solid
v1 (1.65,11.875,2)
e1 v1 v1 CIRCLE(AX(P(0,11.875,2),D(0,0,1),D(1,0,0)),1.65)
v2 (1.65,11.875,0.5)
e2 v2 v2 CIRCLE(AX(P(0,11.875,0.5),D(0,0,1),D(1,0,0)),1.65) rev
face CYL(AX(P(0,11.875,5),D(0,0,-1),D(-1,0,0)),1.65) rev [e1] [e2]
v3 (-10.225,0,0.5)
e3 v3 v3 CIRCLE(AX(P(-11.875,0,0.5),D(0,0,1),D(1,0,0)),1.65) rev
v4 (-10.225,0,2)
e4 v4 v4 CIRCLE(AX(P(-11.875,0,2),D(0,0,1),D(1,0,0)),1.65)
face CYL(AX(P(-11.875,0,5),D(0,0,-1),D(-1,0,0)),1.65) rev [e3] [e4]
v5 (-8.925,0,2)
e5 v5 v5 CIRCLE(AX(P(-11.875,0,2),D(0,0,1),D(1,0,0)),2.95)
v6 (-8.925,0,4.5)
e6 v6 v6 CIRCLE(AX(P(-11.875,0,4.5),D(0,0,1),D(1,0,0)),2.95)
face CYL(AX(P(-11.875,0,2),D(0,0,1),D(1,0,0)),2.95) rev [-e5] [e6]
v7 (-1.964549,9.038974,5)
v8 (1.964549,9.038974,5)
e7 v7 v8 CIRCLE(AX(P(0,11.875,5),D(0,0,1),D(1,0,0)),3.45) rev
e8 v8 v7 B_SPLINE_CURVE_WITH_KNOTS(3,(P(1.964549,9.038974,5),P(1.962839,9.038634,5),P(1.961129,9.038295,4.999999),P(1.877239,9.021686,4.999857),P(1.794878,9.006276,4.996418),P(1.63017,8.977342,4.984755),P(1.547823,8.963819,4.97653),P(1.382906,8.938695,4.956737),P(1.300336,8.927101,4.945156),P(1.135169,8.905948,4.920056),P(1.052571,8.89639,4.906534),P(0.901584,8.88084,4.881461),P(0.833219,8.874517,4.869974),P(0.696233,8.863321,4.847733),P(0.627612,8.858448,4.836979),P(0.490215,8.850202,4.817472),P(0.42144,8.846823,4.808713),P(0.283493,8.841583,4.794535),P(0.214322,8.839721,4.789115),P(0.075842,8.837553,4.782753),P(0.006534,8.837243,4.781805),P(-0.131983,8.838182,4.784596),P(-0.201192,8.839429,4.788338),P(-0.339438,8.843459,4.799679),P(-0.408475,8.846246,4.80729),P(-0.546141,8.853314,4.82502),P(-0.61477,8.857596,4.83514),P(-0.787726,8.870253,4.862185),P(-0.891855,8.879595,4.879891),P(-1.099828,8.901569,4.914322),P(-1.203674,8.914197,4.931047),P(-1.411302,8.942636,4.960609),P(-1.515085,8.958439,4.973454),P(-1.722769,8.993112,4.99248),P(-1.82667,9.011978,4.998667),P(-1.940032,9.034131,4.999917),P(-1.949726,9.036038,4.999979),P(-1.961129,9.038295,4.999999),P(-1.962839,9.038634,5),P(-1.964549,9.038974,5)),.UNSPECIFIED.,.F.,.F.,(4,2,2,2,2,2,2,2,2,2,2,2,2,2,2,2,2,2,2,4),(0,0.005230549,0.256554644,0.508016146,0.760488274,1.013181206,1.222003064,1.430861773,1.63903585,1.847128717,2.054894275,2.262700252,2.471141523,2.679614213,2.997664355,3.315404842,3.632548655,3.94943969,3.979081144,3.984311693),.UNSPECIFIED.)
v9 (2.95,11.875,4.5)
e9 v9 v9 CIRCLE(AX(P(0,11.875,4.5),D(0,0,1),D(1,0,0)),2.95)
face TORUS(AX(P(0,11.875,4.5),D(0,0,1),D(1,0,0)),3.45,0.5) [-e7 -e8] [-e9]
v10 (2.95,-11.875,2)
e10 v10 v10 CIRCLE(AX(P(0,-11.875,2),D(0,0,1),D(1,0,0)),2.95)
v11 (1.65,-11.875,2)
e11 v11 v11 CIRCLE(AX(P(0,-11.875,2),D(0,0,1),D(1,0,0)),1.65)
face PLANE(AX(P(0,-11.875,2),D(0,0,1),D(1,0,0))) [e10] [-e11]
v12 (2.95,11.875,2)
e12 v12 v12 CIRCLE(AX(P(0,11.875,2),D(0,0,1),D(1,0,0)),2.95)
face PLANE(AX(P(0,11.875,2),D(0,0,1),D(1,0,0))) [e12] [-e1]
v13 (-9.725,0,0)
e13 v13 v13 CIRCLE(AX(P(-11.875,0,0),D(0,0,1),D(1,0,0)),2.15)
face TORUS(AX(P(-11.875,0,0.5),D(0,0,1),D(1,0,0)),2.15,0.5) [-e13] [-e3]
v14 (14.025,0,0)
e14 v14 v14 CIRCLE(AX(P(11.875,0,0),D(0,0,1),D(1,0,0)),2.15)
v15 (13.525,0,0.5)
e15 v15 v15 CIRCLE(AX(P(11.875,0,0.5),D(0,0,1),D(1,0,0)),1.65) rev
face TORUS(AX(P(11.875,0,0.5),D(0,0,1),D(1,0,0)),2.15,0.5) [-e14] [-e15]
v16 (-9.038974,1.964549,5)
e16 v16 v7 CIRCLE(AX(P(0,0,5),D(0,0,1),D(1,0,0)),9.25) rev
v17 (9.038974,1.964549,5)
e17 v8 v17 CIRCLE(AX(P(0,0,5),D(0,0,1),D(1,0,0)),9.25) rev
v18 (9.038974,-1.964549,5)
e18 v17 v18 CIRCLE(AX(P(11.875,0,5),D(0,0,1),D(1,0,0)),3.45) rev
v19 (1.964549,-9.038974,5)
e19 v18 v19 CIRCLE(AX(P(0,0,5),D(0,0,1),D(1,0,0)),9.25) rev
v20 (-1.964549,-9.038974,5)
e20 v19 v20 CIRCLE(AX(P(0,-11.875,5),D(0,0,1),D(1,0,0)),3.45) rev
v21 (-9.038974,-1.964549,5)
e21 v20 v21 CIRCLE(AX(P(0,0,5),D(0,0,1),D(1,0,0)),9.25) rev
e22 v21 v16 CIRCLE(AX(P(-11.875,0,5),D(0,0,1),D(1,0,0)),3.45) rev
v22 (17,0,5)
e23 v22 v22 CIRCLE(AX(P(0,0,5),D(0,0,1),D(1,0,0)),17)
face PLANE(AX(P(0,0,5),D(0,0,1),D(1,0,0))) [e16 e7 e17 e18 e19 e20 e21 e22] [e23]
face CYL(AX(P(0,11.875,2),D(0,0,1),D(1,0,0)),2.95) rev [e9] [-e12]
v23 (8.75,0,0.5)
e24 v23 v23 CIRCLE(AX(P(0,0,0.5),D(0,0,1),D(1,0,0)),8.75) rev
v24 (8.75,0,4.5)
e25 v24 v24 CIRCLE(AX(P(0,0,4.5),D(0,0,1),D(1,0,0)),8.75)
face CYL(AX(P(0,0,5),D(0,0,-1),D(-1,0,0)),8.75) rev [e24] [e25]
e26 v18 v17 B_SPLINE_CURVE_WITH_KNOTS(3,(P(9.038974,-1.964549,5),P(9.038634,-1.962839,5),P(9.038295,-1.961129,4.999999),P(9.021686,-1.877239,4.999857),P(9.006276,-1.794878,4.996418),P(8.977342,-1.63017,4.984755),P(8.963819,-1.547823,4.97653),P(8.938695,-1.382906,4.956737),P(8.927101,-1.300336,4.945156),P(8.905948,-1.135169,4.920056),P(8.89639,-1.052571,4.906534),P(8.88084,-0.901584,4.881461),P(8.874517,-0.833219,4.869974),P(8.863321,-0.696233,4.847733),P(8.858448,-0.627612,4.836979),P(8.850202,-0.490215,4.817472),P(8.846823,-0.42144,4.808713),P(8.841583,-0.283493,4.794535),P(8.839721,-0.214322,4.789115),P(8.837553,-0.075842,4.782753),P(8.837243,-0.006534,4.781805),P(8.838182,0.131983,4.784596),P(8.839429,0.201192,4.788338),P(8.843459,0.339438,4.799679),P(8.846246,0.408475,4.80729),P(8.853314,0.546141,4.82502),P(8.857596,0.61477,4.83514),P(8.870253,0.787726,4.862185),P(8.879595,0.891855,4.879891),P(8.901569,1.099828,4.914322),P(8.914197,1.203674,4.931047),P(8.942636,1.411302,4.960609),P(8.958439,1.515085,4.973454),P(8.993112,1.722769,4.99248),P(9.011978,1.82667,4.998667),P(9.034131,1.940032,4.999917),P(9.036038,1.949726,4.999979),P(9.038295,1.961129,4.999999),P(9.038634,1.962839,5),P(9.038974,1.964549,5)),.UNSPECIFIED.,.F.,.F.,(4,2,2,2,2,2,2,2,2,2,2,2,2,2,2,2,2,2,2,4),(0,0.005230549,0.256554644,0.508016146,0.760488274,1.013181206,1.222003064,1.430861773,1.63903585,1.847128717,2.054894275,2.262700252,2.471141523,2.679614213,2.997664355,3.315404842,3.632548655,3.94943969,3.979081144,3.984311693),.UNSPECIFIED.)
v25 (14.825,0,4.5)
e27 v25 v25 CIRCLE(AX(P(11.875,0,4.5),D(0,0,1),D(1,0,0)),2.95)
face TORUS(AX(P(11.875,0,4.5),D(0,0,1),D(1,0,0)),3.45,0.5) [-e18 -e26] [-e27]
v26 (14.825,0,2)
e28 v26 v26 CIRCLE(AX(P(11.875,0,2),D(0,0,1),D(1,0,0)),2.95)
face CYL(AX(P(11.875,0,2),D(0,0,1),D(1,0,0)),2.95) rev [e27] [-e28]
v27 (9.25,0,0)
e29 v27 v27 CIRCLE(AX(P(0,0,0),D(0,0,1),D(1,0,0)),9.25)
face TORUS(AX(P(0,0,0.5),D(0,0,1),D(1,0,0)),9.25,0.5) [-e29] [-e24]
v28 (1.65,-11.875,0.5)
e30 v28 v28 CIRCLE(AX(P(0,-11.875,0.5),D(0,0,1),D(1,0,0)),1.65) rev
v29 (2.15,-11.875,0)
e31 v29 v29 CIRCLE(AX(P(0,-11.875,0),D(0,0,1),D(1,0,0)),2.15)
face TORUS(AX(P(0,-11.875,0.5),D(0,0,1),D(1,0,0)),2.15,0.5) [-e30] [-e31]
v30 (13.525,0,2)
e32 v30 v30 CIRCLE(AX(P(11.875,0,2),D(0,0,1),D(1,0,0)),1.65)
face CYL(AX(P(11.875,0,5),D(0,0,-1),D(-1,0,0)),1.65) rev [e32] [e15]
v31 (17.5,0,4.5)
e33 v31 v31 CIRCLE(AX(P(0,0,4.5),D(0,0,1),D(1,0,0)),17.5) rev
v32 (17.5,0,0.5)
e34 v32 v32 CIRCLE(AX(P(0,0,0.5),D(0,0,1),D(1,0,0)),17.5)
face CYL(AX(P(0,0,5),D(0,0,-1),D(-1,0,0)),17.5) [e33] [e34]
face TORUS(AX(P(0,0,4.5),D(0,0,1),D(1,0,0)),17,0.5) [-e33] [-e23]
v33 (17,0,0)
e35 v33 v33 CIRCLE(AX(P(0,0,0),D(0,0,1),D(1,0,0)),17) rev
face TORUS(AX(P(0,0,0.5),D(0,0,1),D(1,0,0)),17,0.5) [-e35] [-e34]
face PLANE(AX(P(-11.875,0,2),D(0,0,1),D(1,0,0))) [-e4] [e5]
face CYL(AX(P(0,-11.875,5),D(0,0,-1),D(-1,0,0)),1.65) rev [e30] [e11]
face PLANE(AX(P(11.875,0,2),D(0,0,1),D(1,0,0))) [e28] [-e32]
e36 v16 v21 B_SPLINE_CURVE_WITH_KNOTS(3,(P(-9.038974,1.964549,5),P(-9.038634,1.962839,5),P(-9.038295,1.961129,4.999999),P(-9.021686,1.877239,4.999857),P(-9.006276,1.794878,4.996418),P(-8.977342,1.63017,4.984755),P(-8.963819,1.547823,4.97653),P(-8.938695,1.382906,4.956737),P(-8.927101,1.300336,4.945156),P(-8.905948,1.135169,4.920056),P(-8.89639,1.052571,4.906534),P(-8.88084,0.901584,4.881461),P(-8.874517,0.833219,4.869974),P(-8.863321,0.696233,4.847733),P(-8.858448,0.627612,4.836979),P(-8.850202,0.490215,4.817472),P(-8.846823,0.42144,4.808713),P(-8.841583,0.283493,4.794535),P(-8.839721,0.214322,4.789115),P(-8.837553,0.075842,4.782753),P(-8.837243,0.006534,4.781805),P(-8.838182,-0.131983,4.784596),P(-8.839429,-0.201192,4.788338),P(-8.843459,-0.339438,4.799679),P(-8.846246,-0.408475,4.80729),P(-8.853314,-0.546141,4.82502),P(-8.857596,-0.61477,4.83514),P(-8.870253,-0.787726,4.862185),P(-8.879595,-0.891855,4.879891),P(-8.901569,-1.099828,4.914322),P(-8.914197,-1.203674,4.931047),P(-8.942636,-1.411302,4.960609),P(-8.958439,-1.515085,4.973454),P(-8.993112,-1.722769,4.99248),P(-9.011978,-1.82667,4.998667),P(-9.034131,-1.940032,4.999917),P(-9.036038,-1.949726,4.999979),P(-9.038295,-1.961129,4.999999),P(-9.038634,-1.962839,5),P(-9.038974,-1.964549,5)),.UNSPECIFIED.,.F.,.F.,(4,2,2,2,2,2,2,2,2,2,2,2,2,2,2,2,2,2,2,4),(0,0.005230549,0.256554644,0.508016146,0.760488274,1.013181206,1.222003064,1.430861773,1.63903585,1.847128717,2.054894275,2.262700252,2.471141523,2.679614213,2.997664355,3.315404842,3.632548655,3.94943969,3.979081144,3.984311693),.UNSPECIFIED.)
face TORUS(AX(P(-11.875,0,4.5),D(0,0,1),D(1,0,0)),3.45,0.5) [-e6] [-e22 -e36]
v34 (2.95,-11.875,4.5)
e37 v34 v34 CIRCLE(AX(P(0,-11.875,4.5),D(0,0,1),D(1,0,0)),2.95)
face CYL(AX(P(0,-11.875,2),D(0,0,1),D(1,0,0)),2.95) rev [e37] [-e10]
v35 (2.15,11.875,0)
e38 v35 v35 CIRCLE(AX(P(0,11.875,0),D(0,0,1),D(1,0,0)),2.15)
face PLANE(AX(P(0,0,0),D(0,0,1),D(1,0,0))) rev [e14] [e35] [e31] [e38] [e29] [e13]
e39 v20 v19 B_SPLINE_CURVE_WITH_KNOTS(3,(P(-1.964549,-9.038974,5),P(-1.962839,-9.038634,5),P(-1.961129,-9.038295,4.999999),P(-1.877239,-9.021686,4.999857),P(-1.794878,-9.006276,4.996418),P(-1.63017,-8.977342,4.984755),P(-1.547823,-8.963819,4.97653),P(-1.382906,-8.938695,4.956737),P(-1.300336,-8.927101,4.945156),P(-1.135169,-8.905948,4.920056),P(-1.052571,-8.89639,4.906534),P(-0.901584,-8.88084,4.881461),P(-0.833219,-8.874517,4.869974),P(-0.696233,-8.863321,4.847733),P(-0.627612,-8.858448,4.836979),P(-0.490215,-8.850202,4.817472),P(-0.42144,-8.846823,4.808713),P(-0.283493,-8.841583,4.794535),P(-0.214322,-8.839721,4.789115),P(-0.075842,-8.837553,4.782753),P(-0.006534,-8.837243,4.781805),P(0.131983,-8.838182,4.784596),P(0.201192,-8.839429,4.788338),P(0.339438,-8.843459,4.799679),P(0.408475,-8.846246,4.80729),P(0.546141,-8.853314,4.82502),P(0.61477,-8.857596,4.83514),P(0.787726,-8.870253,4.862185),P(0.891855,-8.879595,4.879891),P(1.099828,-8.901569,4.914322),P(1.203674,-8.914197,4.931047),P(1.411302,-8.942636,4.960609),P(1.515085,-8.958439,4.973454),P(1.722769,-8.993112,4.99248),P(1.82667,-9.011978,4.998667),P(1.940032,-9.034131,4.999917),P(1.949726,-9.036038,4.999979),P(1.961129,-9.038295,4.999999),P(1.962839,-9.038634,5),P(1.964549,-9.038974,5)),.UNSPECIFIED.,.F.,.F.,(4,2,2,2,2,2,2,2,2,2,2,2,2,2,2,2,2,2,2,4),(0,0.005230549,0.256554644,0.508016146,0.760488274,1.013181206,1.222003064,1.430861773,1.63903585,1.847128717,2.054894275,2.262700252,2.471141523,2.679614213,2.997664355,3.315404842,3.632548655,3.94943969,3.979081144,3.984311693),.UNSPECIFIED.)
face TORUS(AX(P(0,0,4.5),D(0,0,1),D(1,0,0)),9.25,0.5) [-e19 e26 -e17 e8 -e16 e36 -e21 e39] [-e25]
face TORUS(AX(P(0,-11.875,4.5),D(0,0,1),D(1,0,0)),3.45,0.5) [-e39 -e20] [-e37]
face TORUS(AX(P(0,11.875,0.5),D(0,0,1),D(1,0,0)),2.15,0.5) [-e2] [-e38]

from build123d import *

# Parameters (mm, degrees)
SKIZZE1_R                       = 17.5
SKIZZE1_R_2                     = 15
SKIZZE1_R_3                     = 1.65
SKIZZE1_R_4                     = 8.75
AUFSATZ_LINEAR_AUSTRAGEN1_DEPTH = 5
SKIZZE2_R                       = 2.95
SCHNITT_LINEAR_AUSTRAGEN1_DEPTH = 3
VERRUNDUNG1_R                   = 0.5


with BuildPart() as part:
    # Skizze1 → Aufsatz-Linear austragen1 (new body)
    # profile 1 of 2: a face of its own
    with BuildSketch(Plane.XY):
        Circle(SKIZZE1_R)
        Circle(SKIZZE1_R_2, mode=Mode.SUBTRACT)
    # profile 2 of 2: a face of its own
    with BuildSketch(Plane.XY):
        Circle(SKIZZE1_R_2)
        with Locations((-11.875, 0)):
            Circle(SKIZZE1_R_3, mode=Mode.SUBTRACT)
        with Locations((0, -11.875)):
            Circle(SKIZZE1_R_3, mode=Mode.SUBTRACT)
        with Locations((11.875, 0)):
            Circle(SKIZZE1_R_3, mode=Mode.SUBTRACT)
        with Locations((0, 11.875)):
            Circle(SKIZZE1_R_3, mode=Mode.SUBTRACT)
        Circle(SKIZZE1_R_4, mode=Mode.SUBTRACT)
    extrude(amount=AUFSATZ_LINEAR_AUSTRAGEN1_DEPTH)

    # Skizze2 → Schnitt-Linear austragen1 (cut)
    with BuildSketch(Plane.XY.offset(5)):
        with Locations((0, 11.875)):
            Circle(SKIZZE2_R)
        with Locations((11.875, 0)):
            Circle(SKIZZE2_R)
        with Locations((0, -11.875)):
            Circle(SKIZZE2_R)
        with Locations((-11.875, 0)):
            Circle(SKIZZE2_R)
    extrude(amount=-SCHNITT_LINEAR_AUSTRAGEN1_DEPTH, mode=Mode.SUBTRACT)

    # Verrundung1
    # the kernel refuses this fillet: 0.5 mm, written as the material it takes off along each edge
    with BuildSketch(Plane(origin=(0, -11.875, 0), x_dir=(1, 0, 0), z_dir=(0, -1, 0))) as verrundung1_piece_1:
        with BuildLine():
            CenterArc((1.65 + VERRUNDUNG1_R, VERRUNDUNG1_R), VERRUNDUNG1_R, 180, 90)
            Line((1.65, VERRUNDUNG1_R), (1.65, 0))
            Line((1.65, 0), (1.65 + VERRUNDUNG1_R, 0))
        make_face()
    revolve(axis=Axis((0, -11.875, 0), (0, 0, 1)), mode=Mode.SUBTRACT)
    with BuildSketch(Plane(origin=(-11.875, 0, 0), x_dir=(1, 0, 0), z_dir=(0, -1, 0))) as verrundung1_piece_2:
        with BuildLine():
            CenterArc((1.65 + VERRUNDUNG1_R, VERRUNDUNG1_R), VERRUNDUNG1_R, 180, 90)
            Line((1.65, VERRUNDUNG1_R), (1.65, 0))
            Line((1.65, 0), (1.65 + VERRUNDUNG1_R, 0))
        make_face()
    revolve(axis=Axis((-11.875, 0, 0), (0, 0, 1)), mode=Mode.SUBTRACT)
    with BuildSketch(Plane(origin=(0, 11.875, 5), x_dir=(1, 0, 0), z_dir=(0, -1, 0))) as verrundung1_piece_3:
        with BuildLine():
            CenterArc((2.95 + VERRUNDUNG1_R, -VERRUNDUNG1_R), VERRUNDUNG1_R, 90, 90)
            Line((2.95, -VERRUNDUNG1_R), (2.95, 0))
            Line((2.95, 0), (2.95 + VERRUNDUNG1_R, 0))
        make_face()
    revolve(axis=Axis((0, 11.875, 5), (0, 0, 1)), mode=Mode.SUBTRACT)
    with BuildSketch(Plane(origin=(0, 0, 5), x_dir=(1, 0, 0), z_dir=(0, -1, 0))) as verrundung1_piece_4:
        with BuildLine():
            CenterArc((8.75 + VERRUNDUNG1_R, -VERRUNDUNG1_R), VERRUNDUNG1_R, 90, 90)
            Line((8.75, -VERRUNDUNG1_R), (8.75, 0))
            Line((8.75, 0), (8.75 + VERRUNDUNG1_R, 0))
        make_face()
    revolve(axis=Axis((0, 0, 5), (0, 0, 1)), mode=Mode.SUBTRACT)
    with BuildSketch(Plane(origin=(11.875, 0, 5), x_dir=(1, 0, 0), z_dir=(0, -1, 0))) as verrundung1_piece_5:
        with BuildLine():
            CenterArc((2.95 + VERRUNDUNG1_R, -VERRUNDUNG1_R), VERRUNDUNG1_R, 90, 90)
            Line((2.95, -VERRUNDUNG1_R), (2.95, 0))
            Line((2.95, 0), (2.95 + VERRUNDUNG1_R, 0))
        make_face()
    revolve(axis=Axis((11.875, 0, 5), (0, 0, 1)), mode=Mode.SUBTRACT)
    with BuildSketch(Plane(origin=(0, -11.875, 5), x_dir=(1, 0, 0), z_dir=(0, -1, 0))) as verrundung1_piece_6:
        with BuildLine():
            CenterArc((2.95 + VERRUNDUNG1_R, -VERRUNDUNG1_R), VERRUNDUNG1_R, 90, 90)
            Line((2.95, -VERRUNDUNG1_R), (2.95, 0))
            Line((2.95, 0), (2.95 + VERRUNDUNG1_R, 0))
        make_face()
    revolve(axis=Axis((0, -11.875, 5), (0, 0, 1)), mode=Mode.SUBTRACT)
    with BuildSketch(Plane(origin=(0, 0, 5), x_dir=(1, 0, 0), z_dir=(0, -1, 0))) as verrundung1_piece_7:
        with BuildLine():
            CenterArc((17.5 - VERRUNDUNG1_R, -VERRUNDUNG1_R), VERRUNDUNG1_R, 0, 90)
            Line((17.5 - VERRUNDUNG1_R, 0), (17.5, 0))
            Line((17.5, 0), (17.5, -VERRUNDUNG1_R))
        make_face()
    revolve(axis=Axis((0, 0, 5), (0, 0, 1)), mode=Mode.SUBTRACT)
    with BuildSketch(Plane(origin=(-11.875, 0, 5), x_dir=(1, 0, 0), z_dir=(0, -1, 0))) as verrundung1_piece_8:
        with BuildLine():
            CenterArc((2.95 + VERRUNDUNG1_R, -VERRUNDUNG1_R), VERRUNDUNG1_R, 90, 90)
            Line((2.95, -VERRUNDUNG1_R), (2.95, 0))
            Line((2.95, 0), (2.95 + VERRUNDUNG1_R, 0))
        make_face()
    revolve(axis=Axis((-11.875, 0, 5), (0, 0, 1)), mode=Mode.SUBTRACT)
    with BuildSketch(Plane(origin=(0, 0, 0), x_dir=(1, 0, 0), z_dir=(0, -1, 0))) as verrundung1_piece_9:
        with BuildLine():
            CenterArc((17.5 - VERRUNDUNG1_R, VERRUNDUNG1_R), VERRUNDUNG1_R, 270, 90)
            Line((17.5 - VERRUNDUNG1_R, 0), (17.5, 0))
            Line((17.5, 0), (17.5, VERRUNDUNG1_R))
        make_face()
    revolve(axis=Axis((0, 0, 0), (0, 0, 1)), mode=Mode.SUBTRACT)
    with BuildSketch(Plane(origin=(0, 0, 0), x_dir=(1, 0, 0), z_dir=(0, -1, 0))) as verrundung1_piece_10:
        with BuildLine():
            CenterArc((8.75 + VERRUNDUNG1_R, VERRUNDUNG1_R), VERRUNDUNG1_R, 180, 90)
            Line((8.75, VERRUNDUNG1_R), (8.75, 0))
            Line((8.75, 0), (8.75 + VERRUNDUNG1_R, 0))
        make_face()
    revolve(axis=Axis((0, 0, 0), (0, 0, 1)), mode=Mode.SUBTRACT)
    with BuildSketch(Plane(origin=(0, 11.875, 0), x_dir=(1, 0, 0), z_dir=(0, -1, 0))) as verrundung1_piece_11:
        with BuildLine():
            CenterArc((1.65 + VERRUNDUNG1_R, VERRUNDUNG1_R), VERRUNDUNG1_R, 180, 90)
            Line((1.65, VERRUNDUNG1_R), (1.65, 0))
            Line((1.65, 0), (1.65 + VERRUNDUNG1_R, 0))
        make_face()
    revolve(axis=Axis((0, 11.875, 0), (0, 0, 1)), mode=Mode.SUBTRACT)
    with BuildSketch(Plane(origin=(11.875, 0, 0), x_dir=(1, 0, 0), z_dir=(0, -1, 0))) as verrundung1_piece_12:
        with BuildLine():
            CenterArc((1.65 + VERRUNDUNG1_R, VERRUNDUNG1_R), VERRUNDUNG1_R, 180, 90)
            Line((1.65, VERRUNDUNG1_R), (1.65, 0))
            Line((1.65, 0), (1.65 + VERRUNDUNG1_R, 0))
        make_face()
    revolve(axis=Axis((11.875, 0, 0), (0, 0, 1)), mode=Mode.SUBTRACT)


solid = part.part
